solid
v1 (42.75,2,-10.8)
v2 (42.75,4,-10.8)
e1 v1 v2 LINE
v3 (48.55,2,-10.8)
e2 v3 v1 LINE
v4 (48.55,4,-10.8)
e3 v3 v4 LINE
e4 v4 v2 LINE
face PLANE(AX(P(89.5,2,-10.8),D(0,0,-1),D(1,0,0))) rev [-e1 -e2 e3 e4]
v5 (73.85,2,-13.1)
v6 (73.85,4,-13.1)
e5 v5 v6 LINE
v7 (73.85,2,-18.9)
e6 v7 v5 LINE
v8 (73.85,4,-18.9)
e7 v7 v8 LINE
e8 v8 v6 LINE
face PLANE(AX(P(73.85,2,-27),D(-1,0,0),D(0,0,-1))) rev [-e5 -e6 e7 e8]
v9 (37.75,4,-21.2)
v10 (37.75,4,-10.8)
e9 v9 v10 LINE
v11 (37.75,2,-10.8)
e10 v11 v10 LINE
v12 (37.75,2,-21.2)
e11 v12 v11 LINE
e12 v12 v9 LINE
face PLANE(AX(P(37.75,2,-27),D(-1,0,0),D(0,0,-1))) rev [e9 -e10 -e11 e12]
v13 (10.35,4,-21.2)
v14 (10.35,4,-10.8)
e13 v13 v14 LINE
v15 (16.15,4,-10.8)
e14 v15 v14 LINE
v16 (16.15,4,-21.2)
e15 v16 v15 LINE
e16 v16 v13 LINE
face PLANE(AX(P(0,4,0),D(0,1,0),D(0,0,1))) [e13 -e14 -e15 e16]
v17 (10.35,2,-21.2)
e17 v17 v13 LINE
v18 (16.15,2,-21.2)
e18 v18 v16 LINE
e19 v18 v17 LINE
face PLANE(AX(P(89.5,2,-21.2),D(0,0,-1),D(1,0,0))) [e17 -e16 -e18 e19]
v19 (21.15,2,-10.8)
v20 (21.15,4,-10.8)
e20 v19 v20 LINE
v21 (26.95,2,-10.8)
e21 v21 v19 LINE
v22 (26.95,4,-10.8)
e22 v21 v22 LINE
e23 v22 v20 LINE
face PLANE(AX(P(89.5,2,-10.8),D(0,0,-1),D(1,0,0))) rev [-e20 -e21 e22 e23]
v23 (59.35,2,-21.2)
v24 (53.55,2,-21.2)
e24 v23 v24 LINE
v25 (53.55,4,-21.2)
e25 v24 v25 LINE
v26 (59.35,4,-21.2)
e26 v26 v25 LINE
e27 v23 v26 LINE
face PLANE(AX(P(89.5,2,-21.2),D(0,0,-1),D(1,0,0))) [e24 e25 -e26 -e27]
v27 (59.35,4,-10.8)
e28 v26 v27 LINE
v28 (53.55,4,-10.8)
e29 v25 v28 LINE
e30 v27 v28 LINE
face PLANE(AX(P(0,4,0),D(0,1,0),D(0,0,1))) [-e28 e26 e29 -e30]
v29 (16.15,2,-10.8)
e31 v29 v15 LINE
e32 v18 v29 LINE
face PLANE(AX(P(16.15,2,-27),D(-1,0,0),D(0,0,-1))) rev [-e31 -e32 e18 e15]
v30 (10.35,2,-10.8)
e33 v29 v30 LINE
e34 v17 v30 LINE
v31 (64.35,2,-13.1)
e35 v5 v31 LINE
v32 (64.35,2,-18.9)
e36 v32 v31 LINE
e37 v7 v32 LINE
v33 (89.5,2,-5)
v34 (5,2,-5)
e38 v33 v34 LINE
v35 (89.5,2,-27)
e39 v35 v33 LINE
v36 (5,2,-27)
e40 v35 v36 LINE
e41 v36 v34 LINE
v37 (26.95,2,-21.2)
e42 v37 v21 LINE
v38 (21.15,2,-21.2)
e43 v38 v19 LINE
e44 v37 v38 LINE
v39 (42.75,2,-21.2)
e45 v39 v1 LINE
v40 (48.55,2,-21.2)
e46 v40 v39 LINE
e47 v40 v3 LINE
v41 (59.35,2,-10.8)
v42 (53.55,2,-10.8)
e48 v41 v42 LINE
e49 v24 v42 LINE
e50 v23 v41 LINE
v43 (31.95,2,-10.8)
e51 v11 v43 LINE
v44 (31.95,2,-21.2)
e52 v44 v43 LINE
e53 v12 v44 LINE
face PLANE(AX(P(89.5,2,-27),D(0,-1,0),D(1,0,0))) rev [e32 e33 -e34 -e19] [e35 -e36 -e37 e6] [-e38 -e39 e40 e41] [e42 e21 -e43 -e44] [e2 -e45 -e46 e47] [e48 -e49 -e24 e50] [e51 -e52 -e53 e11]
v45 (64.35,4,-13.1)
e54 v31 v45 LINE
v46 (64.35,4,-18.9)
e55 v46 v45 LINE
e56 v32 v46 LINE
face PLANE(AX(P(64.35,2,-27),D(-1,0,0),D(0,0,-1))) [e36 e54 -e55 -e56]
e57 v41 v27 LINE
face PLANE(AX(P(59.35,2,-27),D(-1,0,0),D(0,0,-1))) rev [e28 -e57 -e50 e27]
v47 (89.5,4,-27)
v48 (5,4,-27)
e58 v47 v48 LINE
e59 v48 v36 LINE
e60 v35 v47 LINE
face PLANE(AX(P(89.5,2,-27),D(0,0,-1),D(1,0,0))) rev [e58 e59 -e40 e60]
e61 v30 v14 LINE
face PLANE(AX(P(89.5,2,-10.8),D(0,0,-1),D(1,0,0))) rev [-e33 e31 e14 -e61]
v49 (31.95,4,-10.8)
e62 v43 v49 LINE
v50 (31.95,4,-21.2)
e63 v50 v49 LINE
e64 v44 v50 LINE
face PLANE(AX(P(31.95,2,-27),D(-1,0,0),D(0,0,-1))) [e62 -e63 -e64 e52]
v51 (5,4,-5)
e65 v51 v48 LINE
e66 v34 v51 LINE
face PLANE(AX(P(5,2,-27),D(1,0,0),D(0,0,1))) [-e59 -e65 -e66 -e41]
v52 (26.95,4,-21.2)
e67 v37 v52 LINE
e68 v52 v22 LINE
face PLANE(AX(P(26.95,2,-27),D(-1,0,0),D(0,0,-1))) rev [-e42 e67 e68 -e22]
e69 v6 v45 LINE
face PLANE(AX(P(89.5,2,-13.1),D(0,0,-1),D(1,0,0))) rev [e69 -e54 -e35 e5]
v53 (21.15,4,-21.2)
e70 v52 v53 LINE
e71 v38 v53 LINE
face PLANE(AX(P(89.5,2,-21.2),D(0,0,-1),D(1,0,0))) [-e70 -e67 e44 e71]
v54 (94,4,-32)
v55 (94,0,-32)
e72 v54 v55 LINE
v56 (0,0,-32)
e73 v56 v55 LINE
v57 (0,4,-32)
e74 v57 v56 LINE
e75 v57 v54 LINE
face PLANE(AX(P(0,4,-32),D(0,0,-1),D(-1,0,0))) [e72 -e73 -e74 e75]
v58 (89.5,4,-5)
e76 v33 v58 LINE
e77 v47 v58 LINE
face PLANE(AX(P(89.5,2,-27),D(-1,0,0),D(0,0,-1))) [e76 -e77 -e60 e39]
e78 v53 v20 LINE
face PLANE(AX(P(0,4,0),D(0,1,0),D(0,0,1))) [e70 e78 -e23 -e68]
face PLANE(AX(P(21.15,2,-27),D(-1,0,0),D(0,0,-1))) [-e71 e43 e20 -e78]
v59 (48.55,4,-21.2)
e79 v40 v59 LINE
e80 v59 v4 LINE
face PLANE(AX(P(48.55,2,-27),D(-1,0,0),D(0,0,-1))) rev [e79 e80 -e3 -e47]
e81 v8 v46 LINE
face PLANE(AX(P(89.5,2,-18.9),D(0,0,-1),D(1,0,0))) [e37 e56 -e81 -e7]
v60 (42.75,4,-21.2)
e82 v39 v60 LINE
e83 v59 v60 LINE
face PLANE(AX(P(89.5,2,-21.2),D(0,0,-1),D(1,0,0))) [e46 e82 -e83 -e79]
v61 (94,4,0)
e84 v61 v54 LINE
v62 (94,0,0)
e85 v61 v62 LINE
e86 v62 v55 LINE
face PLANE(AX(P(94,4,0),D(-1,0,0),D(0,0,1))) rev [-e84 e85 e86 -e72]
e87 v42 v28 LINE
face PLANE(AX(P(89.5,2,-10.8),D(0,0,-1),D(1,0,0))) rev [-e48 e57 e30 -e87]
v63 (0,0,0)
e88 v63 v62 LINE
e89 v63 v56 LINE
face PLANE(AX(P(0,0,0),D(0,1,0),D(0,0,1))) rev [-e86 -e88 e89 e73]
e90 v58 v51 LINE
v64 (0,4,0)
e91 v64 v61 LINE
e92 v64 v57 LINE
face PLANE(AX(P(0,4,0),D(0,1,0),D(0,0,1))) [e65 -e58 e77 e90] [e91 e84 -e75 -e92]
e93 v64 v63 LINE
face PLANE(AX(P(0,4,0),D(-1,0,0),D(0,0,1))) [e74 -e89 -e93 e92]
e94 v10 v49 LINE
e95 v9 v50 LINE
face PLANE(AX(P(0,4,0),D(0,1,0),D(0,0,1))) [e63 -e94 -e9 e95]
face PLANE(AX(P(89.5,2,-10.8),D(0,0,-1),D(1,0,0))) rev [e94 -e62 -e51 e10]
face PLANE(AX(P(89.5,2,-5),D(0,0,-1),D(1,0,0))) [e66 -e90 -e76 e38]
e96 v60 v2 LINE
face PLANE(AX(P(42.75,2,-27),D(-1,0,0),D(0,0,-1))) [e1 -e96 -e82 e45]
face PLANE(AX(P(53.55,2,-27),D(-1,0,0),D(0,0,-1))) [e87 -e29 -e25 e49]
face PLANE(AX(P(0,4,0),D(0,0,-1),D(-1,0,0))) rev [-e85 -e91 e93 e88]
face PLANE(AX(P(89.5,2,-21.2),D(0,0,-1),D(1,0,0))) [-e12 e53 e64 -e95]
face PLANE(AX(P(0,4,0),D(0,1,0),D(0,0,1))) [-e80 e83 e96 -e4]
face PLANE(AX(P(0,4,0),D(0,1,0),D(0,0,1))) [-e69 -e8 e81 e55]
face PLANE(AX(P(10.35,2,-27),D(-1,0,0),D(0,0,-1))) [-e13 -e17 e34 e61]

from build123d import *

# Parameters (mm, degrees)
SKETCH1_W           = 94
SKETCH1_H           = 32
BOSS_EXTRUDE1_DEPTH = 4
CAVITY1_START       = 5
CAVITY1_OUTLINE_W   = 2
CAVITY1_OUTLINE_H   = 5.8
CAVITY1_DEPTH       = 84.5
CAVITY1_START_2     = 73.85
CAVITY1_2_OUTLINE_W = 2
CAVITY1_2_OUTLINE_H = 10.4
CAVITY1_2_DEPTH     = 15.65
CAVITY1_START_3     = 59.35
CAVITY1_3_OUTLINE_W = 2
CAVITY1_3_OUTLINE_H = 2.3
CAVITY1_3_DEPTH     = 14.5
CAVITY1_4_OUTLINE_W = 2
CAVITY1_4_OUTLINE_H = 10.4
CAVITY1_4_DEPTH     = 5.35
CAVITY1_START_4     = 16.15
CAVITY1_5_OUTLINE_W = 2
CAVITY1_5_OUTLINE_H = 10.4
CAVITY1_5_DEPTH     = 5
CAVITY1_START_5     = 26.95
CAVITY1_6_OUTLINE_W = 2
CAVITY1_6_OUTLINE_H = 10.4
CAVITY1_6_DEPTH     = 5
CAVITY1_START_6     = 37.75
CAVITY1_7_OUTLINE_W = 2
CAVITY1_7_OUTLINE_H = 10.4
CAVITY1_7_DEPTH     = 5
CAVITY1_START_7     = 48.55
CAVITY1_8_OUTLINE_W = 2
CAVITY1_8_OUTLINE_H = 10.4
CAVITY1_8_DEPTH     = 5
CAVITY1_9_OUTLINE_W = 2
CAVITY1_9_OUTLINE_H = 5.8
CAVITY1_9_DEPTH     = 5


# Read off the part's stored shape, not the designer's step: Cavity1
with BuildPart() as part:
    # Sketch1 → Boss-Extrude1 (new body)
    with BuildSketch(Plane(origin=(0, 0, 0), x_dir=(1, 0, 0), z_dir=(0, 1, 0))):
        with Locations((47, 16)):
            Rectangle(SKETCH1_W, SKETCH1_H)
    extrude(amount=BOSS_EXTRUDE1_DEPTH)

    # Cavity1 outline → Cavity1 (cut)
    with BuildSketch(Plane.YZ.offset(CAVITY1_START)):
        with Locations((3, -7.9)):
            Rectangle(CAVITY1_OUTLINE_W, CAVITY1_OUTLINE_H)
        with Locations((3, -24.1)):
            Rectangle(CAVITY1_OUTLINE_W, CAVITY1_OUTLINE_H)
    extrude(amount=CAVITY1_DEPTH, mode=Mode.SUBTRACT)

    # Cavity1 2 outline → Cavity1 2 (cut)
    with BuildSketch(Plane.YZ.offset(CAVITY1_START_2)):
        with Locations((3, -16)):
            Rectangle(CAVITY1_2_OUTLINE_W, CAVITY1_2_OUTLINE_H)
    extrude(amount=CAVITY1_2_DEPTH, mode=Mode.SUBTRACT)

    # Cavity1 3 outline → Cavity1 3 (cut)
    with BuildSketch(Plane.YZ.offset(CAVITY1_START_3)):
        with Locations((3, -11.95)):
            Rectangle(CAVITY1_3_OUTLINE_W, CAVITY1_3_OUTLINE_H)
        with Locations((3, -20.05)):
            Rectangle(CAVITY1_3_OUTLINE_W, CAVITY1_3_OUTLINE_H)
    extrude(amount=CAVITY1_3_DEPTH, mode=Mode.SUBTRACT)

    # Cavity1 4 outline → Cavity1 4 (cut)
    with BuildSketch(Plane.YZ.offset(CAVITY1_START)):
        with Locations((3, -16)):
            Rectangle(CAVITY1_4_OUTLINE_W, CAVITY1_4_OUTLINE_H)
    extrude(amount=CAVITY1_4_DEPTH, mode=Mode.SUBTRACT)

    # Cavity1 5 outline → Cavity1 5 (cut)
    with BuildSketch(Plane.YZ.offset(CAVITY1_START_4)):
        with Locations((3, -16)):
            Rectangle(CAVITY1_5_OUTLINE_W, CAVITY1_5_OUTLINE_H)
    extrude(amount=CAVITY1_5_DEPTH, mode=Mode.SUBTRACT)

    # Cavity1 6 outline → Cavity1 6 (cut)
    with BuildSketch(Plane.YZ.offset(CAVITY1_START_5)):
        with Locations((3, -16)):
            Rectangle(CAVITY1_6_OUTLINE_W, CAVITY1_6_OUTLINE_H)
    extrude(amount=CAVITY1_6_DEPTH, mode=Mode.SUBTRACT)

    # Cavity1 7 outline → Cavity1 7 (cut)
    with BuildSketch(Plane.YZ.offset(CAVITY1_START_6)):
        with Locations((3, -16)):
            Rectangle(CAVITY1_7_OUTLINE_W, CAVITY1_7_OUTLINE_H)
    extrude(amount=CAVITY1_7_DEPTH, mode=Mode.SUBTRACT)

    # Cavity1 8 outline → Cavity1 8 (cut)
    with BuildSketch(Plane.YZ.offset(CAVITY1_START_7)):
        with Locations((3, -16)):
            Rectangle(CAVITY1_8_OUTLINE_W, CAVITY1_8_OUTLINE_H)
    extrude(amount=CAVITY1_8_DEPTH, mode=Mode.SUBTRACT)

    # Cavity1 9 outline → Cavity1 9 (cut)
    with BuildSketch(Plane.YZ.offset(CAVITY1_START_3)):
        with Locations((3, -16)):
            Rectangle(CAVITY1_9_OUTLINE_W, CAVITY1_9_OUTLINE_H)
    extrude(amount=CAVITY1_9_DEPTH, mode=Mode.SUBTRACT)


solid = part.part
